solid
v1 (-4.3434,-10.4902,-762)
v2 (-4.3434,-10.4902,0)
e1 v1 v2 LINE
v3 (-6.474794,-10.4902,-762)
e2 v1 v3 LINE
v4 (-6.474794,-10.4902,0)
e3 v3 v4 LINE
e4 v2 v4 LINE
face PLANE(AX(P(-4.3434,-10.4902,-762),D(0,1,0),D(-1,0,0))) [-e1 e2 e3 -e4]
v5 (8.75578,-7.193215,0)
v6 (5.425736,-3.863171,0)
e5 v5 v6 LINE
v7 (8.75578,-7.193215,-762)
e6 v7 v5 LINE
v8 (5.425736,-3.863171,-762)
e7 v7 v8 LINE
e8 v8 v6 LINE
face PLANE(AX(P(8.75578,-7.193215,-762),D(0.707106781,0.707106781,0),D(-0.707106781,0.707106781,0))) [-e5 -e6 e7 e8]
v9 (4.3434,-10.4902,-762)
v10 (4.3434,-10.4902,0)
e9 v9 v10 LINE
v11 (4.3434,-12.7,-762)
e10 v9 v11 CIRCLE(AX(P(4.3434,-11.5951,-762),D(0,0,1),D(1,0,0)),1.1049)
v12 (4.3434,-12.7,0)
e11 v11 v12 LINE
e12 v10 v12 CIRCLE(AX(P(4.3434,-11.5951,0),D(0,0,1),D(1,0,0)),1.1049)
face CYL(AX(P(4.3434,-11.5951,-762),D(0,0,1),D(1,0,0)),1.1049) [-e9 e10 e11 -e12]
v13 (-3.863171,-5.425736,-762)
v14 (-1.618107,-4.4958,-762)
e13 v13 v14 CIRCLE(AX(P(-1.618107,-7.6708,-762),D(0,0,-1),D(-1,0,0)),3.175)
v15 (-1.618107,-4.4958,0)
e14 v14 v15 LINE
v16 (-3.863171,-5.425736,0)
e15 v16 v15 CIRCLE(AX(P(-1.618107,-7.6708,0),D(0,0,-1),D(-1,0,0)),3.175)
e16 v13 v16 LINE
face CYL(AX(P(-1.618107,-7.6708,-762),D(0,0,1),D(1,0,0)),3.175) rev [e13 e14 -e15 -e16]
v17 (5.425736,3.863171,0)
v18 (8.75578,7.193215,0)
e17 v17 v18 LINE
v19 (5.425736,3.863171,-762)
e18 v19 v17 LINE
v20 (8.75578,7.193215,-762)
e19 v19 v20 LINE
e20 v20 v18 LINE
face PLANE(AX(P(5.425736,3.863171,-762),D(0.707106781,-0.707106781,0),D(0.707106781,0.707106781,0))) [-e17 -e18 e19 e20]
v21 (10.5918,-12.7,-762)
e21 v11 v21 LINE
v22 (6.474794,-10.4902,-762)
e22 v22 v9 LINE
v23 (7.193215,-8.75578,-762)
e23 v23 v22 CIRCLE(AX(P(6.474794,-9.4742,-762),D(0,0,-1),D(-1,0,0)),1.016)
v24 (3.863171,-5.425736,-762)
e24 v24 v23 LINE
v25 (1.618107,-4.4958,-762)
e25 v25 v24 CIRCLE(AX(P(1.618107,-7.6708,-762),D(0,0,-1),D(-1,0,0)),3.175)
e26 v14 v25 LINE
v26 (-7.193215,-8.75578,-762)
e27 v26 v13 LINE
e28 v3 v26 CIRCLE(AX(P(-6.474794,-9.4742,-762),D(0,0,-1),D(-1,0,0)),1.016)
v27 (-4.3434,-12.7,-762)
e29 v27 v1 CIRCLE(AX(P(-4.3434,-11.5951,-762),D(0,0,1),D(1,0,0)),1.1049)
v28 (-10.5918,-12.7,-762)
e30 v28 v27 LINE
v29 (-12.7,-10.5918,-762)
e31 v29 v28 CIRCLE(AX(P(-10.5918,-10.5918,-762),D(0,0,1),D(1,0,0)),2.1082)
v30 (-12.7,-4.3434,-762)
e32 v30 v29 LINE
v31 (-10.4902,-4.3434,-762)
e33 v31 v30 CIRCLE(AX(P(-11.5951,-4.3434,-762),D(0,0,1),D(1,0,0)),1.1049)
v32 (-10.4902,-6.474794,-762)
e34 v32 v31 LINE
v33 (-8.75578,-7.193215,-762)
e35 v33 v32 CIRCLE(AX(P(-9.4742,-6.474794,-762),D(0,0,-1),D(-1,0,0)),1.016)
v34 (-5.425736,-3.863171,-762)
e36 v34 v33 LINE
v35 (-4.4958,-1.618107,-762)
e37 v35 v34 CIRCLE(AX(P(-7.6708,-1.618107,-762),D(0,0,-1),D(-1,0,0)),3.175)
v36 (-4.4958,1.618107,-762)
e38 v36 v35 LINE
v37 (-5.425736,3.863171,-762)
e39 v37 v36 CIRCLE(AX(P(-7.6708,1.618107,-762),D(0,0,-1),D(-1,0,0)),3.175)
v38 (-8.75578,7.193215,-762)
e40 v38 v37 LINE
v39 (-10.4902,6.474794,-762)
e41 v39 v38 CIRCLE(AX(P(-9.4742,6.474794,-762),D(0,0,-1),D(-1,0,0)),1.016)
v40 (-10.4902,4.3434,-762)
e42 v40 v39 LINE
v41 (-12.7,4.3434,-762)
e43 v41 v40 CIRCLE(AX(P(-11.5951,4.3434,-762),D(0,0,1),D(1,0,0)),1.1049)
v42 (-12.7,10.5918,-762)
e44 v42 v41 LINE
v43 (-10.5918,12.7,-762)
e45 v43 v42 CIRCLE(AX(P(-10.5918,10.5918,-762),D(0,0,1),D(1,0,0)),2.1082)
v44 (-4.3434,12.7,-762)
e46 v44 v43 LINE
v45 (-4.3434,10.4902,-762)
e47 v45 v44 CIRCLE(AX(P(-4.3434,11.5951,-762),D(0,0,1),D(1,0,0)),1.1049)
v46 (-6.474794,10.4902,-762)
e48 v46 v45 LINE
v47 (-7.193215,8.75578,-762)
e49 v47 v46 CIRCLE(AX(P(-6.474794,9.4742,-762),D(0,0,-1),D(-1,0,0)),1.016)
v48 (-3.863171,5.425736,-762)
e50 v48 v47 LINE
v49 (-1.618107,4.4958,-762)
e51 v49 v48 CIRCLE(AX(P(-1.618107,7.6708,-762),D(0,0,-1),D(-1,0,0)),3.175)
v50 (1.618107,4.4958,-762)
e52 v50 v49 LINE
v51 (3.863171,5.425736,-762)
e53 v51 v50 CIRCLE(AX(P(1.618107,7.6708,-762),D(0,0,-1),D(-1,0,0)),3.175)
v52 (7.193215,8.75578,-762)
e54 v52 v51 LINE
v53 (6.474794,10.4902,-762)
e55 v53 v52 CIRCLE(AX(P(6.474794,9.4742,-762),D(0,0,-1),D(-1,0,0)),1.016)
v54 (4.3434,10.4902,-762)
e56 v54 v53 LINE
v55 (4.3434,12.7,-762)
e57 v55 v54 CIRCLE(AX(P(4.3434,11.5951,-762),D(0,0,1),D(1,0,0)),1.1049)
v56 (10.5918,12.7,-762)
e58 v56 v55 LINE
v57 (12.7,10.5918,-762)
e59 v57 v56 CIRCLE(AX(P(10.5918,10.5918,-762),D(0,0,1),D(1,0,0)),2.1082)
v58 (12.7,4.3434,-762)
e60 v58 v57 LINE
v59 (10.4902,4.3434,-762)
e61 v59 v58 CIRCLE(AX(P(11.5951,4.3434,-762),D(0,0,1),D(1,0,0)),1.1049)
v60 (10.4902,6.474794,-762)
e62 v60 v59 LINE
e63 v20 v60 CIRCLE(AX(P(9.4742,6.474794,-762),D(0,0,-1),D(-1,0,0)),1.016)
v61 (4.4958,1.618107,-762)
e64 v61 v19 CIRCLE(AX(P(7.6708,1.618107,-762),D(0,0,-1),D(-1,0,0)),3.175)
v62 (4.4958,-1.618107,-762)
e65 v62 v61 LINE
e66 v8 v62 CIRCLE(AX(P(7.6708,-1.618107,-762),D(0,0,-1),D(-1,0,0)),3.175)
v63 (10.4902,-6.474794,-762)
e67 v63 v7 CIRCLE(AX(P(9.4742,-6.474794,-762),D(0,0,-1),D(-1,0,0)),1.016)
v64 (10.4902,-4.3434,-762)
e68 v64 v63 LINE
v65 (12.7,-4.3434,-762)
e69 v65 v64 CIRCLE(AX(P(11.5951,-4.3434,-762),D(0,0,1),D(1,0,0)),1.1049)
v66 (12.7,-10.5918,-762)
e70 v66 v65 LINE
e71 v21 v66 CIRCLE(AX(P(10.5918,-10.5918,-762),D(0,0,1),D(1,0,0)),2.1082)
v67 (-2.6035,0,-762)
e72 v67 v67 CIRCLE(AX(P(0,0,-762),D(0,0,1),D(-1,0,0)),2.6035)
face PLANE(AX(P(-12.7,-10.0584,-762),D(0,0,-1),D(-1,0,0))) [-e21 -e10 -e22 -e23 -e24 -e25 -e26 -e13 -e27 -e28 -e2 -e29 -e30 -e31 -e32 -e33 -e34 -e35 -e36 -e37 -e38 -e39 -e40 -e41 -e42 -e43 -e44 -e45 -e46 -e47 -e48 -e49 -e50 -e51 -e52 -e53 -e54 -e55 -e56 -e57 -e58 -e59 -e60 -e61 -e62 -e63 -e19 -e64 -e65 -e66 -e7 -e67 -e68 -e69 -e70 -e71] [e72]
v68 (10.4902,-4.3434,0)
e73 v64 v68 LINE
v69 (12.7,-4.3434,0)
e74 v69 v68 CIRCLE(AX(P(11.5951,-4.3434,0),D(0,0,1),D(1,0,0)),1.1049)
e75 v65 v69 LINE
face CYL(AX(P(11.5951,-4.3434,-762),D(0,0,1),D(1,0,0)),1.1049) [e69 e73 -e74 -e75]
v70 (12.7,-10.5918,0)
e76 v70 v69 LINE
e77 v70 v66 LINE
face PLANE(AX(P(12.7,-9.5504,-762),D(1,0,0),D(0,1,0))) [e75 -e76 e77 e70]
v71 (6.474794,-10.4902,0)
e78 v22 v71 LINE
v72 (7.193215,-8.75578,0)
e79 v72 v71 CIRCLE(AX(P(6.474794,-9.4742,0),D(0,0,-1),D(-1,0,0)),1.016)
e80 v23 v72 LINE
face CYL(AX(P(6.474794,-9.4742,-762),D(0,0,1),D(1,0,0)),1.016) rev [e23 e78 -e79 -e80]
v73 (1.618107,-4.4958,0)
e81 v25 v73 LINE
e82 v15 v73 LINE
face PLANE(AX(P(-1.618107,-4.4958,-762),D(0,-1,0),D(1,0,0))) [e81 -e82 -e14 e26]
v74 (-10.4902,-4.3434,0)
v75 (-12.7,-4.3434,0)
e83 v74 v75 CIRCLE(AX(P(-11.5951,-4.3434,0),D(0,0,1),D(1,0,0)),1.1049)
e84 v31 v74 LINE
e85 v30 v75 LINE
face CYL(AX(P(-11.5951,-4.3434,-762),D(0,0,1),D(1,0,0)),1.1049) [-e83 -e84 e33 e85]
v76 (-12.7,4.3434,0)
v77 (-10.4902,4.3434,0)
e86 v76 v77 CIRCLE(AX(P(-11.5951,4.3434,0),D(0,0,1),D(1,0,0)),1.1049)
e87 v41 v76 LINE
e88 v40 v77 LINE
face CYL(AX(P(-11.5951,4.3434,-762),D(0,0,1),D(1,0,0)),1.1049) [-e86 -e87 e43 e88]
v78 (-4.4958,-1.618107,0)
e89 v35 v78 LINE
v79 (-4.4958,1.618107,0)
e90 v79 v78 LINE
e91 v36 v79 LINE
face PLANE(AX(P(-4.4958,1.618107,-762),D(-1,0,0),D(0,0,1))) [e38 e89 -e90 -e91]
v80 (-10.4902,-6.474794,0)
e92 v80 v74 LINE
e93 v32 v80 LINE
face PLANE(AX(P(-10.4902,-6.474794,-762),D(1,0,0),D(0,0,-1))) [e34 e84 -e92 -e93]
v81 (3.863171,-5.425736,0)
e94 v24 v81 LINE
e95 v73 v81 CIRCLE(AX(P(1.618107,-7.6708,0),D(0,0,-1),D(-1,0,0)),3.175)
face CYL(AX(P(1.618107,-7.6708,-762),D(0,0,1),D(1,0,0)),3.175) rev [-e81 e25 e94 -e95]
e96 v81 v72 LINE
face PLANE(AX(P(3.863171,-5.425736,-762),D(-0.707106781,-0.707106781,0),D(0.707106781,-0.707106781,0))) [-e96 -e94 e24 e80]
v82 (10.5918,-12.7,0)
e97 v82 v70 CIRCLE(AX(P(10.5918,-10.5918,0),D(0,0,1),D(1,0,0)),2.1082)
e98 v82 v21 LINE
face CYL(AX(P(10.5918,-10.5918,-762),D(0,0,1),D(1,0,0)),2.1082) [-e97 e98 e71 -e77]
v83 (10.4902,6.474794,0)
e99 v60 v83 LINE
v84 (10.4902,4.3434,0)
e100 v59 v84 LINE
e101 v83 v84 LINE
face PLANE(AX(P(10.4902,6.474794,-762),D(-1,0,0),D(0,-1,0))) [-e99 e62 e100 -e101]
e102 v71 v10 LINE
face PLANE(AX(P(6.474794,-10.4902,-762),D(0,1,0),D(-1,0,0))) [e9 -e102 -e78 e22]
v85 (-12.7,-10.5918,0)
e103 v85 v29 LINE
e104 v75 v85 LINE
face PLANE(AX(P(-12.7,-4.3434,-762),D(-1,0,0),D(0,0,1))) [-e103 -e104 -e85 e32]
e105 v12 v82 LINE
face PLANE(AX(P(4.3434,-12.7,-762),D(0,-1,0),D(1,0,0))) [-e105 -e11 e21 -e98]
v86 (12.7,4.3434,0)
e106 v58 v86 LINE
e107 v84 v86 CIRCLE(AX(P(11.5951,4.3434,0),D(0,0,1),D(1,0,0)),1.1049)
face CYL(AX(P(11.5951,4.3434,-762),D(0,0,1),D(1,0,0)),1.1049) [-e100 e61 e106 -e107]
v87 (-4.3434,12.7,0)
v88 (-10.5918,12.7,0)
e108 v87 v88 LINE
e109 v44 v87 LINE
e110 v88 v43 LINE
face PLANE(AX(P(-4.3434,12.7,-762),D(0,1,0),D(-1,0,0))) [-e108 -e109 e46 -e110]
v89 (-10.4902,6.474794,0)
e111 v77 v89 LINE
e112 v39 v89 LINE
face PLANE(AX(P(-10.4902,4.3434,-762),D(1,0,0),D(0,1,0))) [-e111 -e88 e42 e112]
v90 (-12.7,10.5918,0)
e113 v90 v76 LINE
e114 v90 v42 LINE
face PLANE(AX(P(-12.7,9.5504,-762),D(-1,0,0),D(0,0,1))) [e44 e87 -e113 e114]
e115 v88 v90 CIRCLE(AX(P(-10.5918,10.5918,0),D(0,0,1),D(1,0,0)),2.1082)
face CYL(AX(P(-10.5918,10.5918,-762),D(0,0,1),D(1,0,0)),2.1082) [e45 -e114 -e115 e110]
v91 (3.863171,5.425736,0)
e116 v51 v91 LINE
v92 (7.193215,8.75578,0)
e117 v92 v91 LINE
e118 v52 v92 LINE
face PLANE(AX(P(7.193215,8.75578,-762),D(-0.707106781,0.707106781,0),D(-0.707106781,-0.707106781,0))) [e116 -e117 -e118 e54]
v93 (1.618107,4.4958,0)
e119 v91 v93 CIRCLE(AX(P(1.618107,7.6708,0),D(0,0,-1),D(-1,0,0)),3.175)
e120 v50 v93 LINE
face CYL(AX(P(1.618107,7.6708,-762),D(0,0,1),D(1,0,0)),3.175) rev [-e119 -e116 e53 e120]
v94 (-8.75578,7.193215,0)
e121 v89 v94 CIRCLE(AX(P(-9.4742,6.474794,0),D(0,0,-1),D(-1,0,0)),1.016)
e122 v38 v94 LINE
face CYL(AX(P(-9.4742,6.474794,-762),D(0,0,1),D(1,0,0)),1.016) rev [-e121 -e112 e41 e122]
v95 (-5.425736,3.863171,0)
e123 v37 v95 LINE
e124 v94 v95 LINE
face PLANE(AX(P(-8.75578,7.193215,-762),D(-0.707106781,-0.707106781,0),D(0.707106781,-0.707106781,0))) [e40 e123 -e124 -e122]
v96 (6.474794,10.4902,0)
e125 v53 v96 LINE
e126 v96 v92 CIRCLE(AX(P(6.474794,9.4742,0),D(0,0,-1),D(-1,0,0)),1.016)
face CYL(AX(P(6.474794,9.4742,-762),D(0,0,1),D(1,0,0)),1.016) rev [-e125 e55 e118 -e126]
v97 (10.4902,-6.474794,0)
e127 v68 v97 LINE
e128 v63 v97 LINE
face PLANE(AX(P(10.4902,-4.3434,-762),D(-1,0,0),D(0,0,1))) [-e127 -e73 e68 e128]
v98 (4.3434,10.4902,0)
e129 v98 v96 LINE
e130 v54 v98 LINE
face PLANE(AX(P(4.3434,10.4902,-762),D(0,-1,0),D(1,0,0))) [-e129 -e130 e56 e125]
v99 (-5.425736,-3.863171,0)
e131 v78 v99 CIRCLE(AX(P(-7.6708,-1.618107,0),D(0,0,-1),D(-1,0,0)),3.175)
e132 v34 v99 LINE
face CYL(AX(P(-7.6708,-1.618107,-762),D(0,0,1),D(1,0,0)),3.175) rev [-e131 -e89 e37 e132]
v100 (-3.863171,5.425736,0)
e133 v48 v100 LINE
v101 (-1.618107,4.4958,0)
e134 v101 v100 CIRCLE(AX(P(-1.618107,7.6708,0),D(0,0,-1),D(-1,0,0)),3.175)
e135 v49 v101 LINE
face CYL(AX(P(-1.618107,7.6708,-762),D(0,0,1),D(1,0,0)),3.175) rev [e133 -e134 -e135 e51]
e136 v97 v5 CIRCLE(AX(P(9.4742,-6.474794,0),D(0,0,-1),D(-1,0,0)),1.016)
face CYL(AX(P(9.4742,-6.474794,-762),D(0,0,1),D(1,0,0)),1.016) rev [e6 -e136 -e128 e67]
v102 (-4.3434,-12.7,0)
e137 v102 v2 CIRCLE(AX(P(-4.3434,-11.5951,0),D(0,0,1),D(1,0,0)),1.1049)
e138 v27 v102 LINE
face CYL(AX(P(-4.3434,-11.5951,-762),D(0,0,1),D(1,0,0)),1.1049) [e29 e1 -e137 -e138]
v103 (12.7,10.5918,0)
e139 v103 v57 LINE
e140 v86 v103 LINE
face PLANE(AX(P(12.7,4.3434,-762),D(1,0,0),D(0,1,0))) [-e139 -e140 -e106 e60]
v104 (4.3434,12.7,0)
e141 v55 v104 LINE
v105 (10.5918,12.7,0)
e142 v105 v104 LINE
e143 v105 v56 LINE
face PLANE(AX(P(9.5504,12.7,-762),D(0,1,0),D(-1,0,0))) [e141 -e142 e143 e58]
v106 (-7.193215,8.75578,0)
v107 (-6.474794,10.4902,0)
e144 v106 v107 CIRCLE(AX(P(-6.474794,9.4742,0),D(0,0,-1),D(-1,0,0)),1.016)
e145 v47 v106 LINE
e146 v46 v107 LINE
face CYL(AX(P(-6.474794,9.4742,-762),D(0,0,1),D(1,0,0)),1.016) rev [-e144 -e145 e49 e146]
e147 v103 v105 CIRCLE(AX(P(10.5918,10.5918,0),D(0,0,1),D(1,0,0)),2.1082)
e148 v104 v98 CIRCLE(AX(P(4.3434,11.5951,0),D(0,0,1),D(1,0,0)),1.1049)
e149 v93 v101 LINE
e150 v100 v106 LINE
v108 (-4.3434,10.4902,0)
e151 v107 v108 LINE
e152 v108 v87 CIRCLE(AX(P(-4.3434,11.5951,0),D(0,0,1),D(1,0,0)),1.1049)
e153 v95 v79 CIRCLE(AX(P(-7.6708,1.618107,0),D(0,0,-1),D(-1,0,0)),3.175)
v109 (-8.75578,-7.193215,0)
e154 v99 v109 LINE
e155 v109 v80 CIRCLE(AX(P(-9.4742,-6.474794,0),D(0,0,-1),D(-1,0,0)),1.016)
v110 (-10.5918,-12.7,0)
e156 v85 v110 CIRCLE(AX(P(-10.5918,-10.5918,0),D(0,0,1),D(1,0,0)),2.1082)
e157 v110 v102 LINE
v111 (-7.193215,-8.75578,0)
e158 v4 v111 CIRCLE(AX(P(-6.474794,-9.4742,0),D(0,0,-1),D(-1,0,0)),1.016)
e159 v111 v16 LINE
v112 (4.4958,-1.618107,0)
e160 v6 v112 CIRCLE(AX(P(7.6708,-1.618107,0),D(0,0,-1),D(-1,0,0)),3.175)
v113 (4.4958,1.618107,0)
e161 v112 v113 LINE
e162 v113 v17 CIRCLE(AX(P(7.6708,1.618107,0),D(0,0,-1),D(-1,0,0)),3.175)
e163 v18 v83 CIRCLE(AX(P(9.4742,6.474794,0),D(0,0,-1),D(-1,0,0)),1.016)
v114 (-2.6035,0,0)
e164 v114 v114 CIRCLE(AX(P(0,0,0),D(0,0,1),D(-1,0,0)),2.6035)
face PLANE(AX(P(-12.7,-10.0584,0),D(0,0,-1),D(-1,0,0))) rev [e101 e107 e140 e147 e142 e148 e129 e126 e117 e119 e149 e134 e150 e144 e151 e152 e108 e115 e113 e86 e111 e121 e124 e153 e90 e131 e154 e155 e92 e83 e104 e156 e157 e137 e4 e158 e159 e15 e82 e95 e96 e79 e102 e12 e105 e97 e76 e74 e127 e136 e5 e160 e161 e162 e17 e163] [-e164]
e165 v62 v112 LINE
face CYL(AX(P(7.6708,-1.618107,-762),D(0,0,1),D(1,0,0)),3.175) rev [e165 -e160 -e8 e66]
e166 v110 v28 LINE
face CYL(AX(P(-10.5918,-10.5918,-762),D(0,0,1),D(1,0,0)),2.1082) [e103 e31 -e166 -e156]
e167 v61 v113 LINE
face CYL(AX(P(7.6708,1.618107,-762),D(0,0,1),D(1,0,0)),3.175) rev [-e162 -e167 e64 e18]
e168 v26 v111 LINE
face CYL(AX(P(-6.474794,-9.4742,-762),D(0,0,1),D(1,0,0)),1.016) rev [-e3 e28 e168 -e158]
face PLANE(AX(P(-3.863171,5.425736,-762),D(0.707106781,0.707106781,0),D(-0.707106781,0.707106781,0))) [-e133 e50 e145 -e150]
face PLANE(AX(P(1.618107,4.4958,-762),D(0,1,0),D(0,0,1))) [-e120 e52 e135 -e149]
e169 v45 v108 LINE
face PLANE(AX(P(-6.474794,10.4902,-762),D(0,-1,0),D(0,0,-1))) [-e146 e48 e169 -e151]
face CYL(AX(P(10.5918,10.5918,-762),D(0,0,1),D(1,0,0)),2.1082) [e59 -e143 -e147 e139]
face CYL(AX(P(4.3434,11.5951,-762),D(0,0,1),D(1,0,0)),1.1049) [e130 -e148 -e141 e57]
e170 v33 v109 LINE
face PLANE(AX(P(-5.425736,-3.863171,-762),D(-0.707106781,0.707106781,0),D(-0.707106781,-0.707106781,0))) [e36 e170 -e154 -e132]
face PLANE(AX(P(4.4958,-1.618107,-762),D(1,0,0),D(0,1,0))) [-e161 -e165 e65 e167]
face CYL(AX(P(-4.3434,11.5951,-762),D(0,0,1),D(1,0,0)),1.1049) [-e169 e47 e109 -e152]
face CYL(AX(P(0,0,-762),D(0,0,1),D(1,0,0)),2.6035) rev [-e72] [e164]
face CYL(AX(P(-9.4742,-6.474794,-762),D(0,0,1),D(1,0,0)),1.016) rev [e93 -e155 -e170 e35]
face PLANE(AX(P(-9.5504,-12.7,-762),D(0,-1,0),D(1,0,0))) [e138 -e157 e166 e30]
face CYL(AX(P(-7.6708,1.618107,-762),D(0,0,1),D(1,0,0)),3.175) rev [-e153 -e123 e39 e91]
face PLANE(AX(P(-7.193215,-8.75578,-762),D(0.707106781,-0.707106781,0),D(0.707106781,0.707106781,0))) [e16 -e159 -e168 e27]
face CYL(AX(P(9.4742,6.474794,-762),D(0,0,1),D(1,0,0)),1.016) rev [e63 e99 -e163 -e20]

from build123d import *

# Parameters (mm, degrees)
SKETCH1_R           = 2.6035
BOSS_EXTRUDE1_DEPTH = 762
DELETEFACE1_START   = -762
DELETEFACE1_DEPTH   = 762


# Read off the part's stored shape, not the designer's step: DeleteFace1
with BuildPart() as part:
    # Sketch1 → Boss-Extrude1 (new body)
    with BuildSketch(Plane.XY):
        with BuildLine():
            Line((-9.5504, -12.7), (-6.3330836, -12.7))
            ThreePointArc((-6.3330836, -12.7), (-5.8250836, -12.192), (-5.3170836, -12.7))
            Line((-5.3170836, -12.7), (-4.343399971, -12.7))
            ThreePointArc((-4.343399971, -12.7), (-3.238499971, -11.5951), (-4.343399971, -10.4902))
            Line((-4.343399971, -10.4902), (-6.474794456, -10.4902))
            ThreePointArc((-6.474794456, -10.4902), (-7.413456061, -9.863006367), (-7.193214945, -8.75577951))
            Line((-7.193214945, -8.75577951), (-3.863171405, -5.42573597))
            ThreePointArc((-3.863171405, -5.42573597), (-2.833127272, -4.737482484), (-1.618107374, -4.4958))
            Line((-1.618107374, -4.4958), (1.618107374, -4.4958))
            ThreePointArc((1.618107374, -4.4958), (2.833127272, -4.737482484), (3.863171405, -5.42573597))
            Line((3.863171405, -5.42573597), (7.193214945, -8.75577951))
            ThreePointArc((7.193214945, -8.75577951), (7.413456061, -9.863006367), (6.474794456, -10.4902))
            Line((6.474794456, -10.4902), (4.3434, -10.4902))
            ThreePointArc((4.3434, -10.4902), (3.2385, -11.5951), (4.3434, -12.7))
            Line((4.3434, -12.7), (5.3170836, -12.7))
            ThreePointArc((5.3170836, -12.7), (5.8250836, -12.192), (6.3330836, -12.7))
            Line((6.3330836, -12.7), (9.5504, -12.7))
            ThreePointArc((9.5504, -12.7), (10.058323491, -12.192000006), (10.566399977, -12.699846982))
            ThreePointArc((10.566399977, -12.699846982), (12.082522516, -12.082522516), (12.699846982, -10.566399977))
            ThreePointArc((12.699846982, -10.566399977), (12.192000006, -10.058323491), (12.7, -9.5504))
            Line((12.7, -9.5504), (12.7, -6.3330836))
            ThreePointArc((12.7, -6.3330836), (12.192, -5.8250836), (12.7, -5.3170836))
            Line((12.7, -5.3170836), (12.7, -4.343399971))
            ThreePointArc((12.7, -4.343399971), (11.5951, -3.238499971), (10.4902, -4.343399971))
            Line((10.4902, -4.343399971), (10.4902, -6.474794456))
            ThreePointArc((10.4902, -6.474794456), (9.863006367, -7.413456061), (8.75577951, -7.193214945))
            Line((8.75577951, -7.193214945), (5.42573597, -3.863171405))
            ThreePointArc((5.42573597, -3.863171405), (4.737482484, -2.833127272), (4.4958, -1.618107374))
            Line((4.4958, -1.618107374), (4.4958, 1.618107374))
            ThreePointArc((4.4958, 1.618107374), (4.737482484, 2.833127272), (5.42573597, 3.863171405))
            Line((5.42573597, 3.863171405), (8.75577951, 7.193214945))
            ThreePointArc((8.75577951, 7.193214945), (9.863006367, 7.413456061), (10.4902, 6.474794456))
            Line((10.4902, 6.474794456), (10.4902, 4.3434))
            ThreePointArc((10.4902, 4.3434), (11.5951, 3.2385), (12.7, 4.3434))
            Line((12.7, 4.3434), (12.7, 5.3170836))
            ThreePointArc((12.7, 5.3170836), (12.192, 5.8250836), (12.7, 6.3330836))
            Line((12.7, 6.3330836), (12.7, 9.5504))
            ThreePointArc((12.7, 9.5504), (12.192000006, 10.058323491), (12.699846982, 10.566399977))
            ThreePointArc((12.699846982, 10.566399977), (12.082522516, 12.082522516), (10.566399977, 12.699846982))
            ThreePointArc((10.566399977, 12.699846982), (10.058323491, 12.192000006), (9.5504, 12.7))
            Line((9.5504, 12.7), (6.3330836, 12.7))
            ThreePointArc((6.3330836, 12.7), (5.8250836, 12.192), (5.3170836, 12.7))
            Line((5.3170836, 12.7), (4.343399971, 12.7))
            ThreePointArc((4.343399971, 12.7), (3.238499971, 11.5951), (4.343399971, 10.4902))
            Line((4.343399971, 10.4902), (6.474794456, 10.4902))
            ThreePointArc((6.474794456, 10.4902), (7.413456061, 9.863006367), (7.193214945, 8.75577951))
            Line((7.193214945, 8.75577951), (3.863171405, 5.42573597))
            ThreePointArc((3.863171405, 5.42573597), (2.833127272, 4.737482484), (1.618107374, 4.4958))
            Line((1.618107374, 4.4958), (-1.618107374, 4.4958))
            ThreePointArc((-1.618107374, 4.4958), (-2.833127272, 4.737482484), (-3.863171405, 5.42573597))
            Line((-3.863171405, 5.42573597), (-7.193214945, 8.75577951))
            ThreePointArc((-7.193214945, 8.75577951), (-7.413456061, 9.863006367), (-6.474794456, 10.4902))
            Line((-6.474794456, 10.4902), (-4.3434, 10.4902))
            ThreePointArc((-4.3434, 10.4902), (-3.2385, 11.5951), (-4.3434, 12.7))
            Line((-4.3434, 12.7), (-5.3170836, 12.7))
            ThreePointArc((-5.3170836, 12.7), (-5.8250836, 12.192), (-6.3330836, 12.7))
            Line((-6.3330836, 12.7), (-9.5504, 12.7))
            ThreePointArc((-9.5504, 12.7), (-10.058323491, 12.192000006), (-10.566399977, 12.699846982))
            ThreePointArc((-10.566399977, 12.699846982), (-12.082522516, 12.082522516), (-12.699846982, 10.566399977))
            ThreePointArc((-12.699846982, 10.566399977), (-12.192000006, 10.058323491), (-12.7, 9.5504))
            Line((-12.7, 9.5504), (-12.7, 6.3330836))
            ThreePointArc((-12.7, 6.3330836), (-12.192, 5.8250836), (-12.7, 5.3170836))
            Line((-12.7, 5.3170836), (-12.7, 4.343399971))
            ThreePointArc((-12.7, 4.343399971), (-11.5951, 3.238499971), (-10.4902, 4.343399971))
            Line((-10.4902, 4.343399971), (-10.4902, 6.474794456))
            ThreePointArc((-10.4902, 6.474794456), (-9.863006367, 7.413456061), (-8.75577951, 7.193214945))
            Line((-8.75577951, 7.193214945), (-5.42573597, 3.863171405))
            ThreePointArc((-5.42573597, 3.863171405), (-4.737482484, 2.833127272), (-4.4958, 1.618107374))
            Line((-4.4958, 1.618107374), (-4.4958, -1.618107374))
            ThreePointArc((-4.4958, -1.618107374), (-4.737482484, -2.833127272), (-5.42573597, -3.863171405))
            Line((-5.42573597, -3.863171405), (-8.75577951, -7.193214945))
            ThreePointArc((-8.75577951, -7.193214945), (-9.863006367, -7.413456061), (-10.4902, -6.474794456))
            Line((-10.4902, -6.474794456), (-10.4902, -4.3434))
            ThreePointArc((-10.4902, -4.3434), (-11.5951, -3.2385), (-12.7, -4.3434))
            Line((-12.7, -4.3434), (-12.7, -5.3170836))
            ThreePointArc((-12.7, -5.3170836), (-12.192, -5.8250836), (-12.7, -6.3330836))
            Line((-12.7, -6.3330836), (-12.7, -9.5504))
            ThreePointArc((-12.7, -9.5504), (-12.192000006, -10.058323491), (-12.699846982, -10.566399977))
            ThreePointArc((-12.699846982, -10.566399977), (-12.082522516, -12.082522516), (-10.566399977, -12.699846982))
            ThreePointArc((-10.566399977, -12.699846982), (-10.058323491, -12.192000006), (-9.5504, -12.7))
        make_face()
        with Locations(Location((0, 0, 0), (0, 0, 180))):
            Circle(SKETCH1_R, mode=Mode.SUBTRACT)
    extrude(amount=-BOSS_EXTRUDE1_DEPTH)

    # DeleteFace1 outline → DeleteFace1 (add)
    with BuildSketch(Plane.XY.offset(DELETEFACE1_START)):
        with BuildLine():
            ThreePointArc((-12.7, -6.3330836), (-12.192, -5.8250836), (-12.7, -5.3170836))
            Line((-12.7, -5.3170836), (-12.7, -6.3330836))
        make_face()
        with BuildLine():
            ThreePointArc((-5.3170836, -12.7), (-5.8250836, -12.192), (-6.3330836, -12.7))
            Line((-6.3330836, -12.7), (-5.3170836, -12.7))
        make_face()
        with BuildLine():
            ThreePointArc((-10.566399977, -12.699846982), (-10.579099758, -12.699961745), (-10.5918, -12.7))
            Line((-10.5918, -12.7), (-9.5504, -12.7))
            ThreePointArc((-9.5504, -12.7), (-10.058323491, -12.192000006), (-10.566399977, -12.699846982))
        make_face()
        with BuildLine():
            ThreePointArc((-12.699846982, -10.566399977), (-12.192000006, -10.058323491), (-12.7, -9.5504))
            Line((-12.7, -9.5504), (-12.7, -10.5918))
            ThreePointArc((-12.7, -10.5918), (-12.699961745, -10.579099758), (-12.699846982, -10.566399977))
        make_face()
        with BuildLine():
            ThreePointArc((-12.699846982, 10.566399977), (-12.699961745, 10.579099758), (-12.7, 10.5918))
            Line((-12.7, 10.5918), (-12.7, 9.5504))
            ThreePointArc((-12.7, 9.5504), (-12.192000006, 10.058323491), (-12.699846982, 10.566399977))
        make_face()
        with BuildLine():
            Line((-5.3170836, 12.7), (-6.3330836, 12.7))
            ThreePointArc((-6.3330836, 12.7), (-5.8250836, 12.192), (-5.3170836, 12.7))
        make_face()
        with BuildLine():
            Line((-9.5504, 12.7), (-10.5918, 12.7))
            ThreePointArc((-10.5918, 12.7), (-10.579099758, 12.699961745), (-10.566399977, 12.699846982))
            ThreePointArc((-10.566399977, 12.699846982), (-10.058323491, 12.192000006), (-9.5504, 12.7))
        make_face()
        with BuildLine():
            ThreePointArc((-12.7, 5.3170836), (-12.192, 5.8250836), (-12.7, 6.3330836))
            Line((-12.7, 6.3330836), (-12.7, 5.3170836))
        make_face()
        with BuildLine():
            ThreePointArc((10.566399977, 12.699846982), (10.579099758, 12.699961745), (10.5918, 12.7))
            Line((10.5918, 12.7), (9.5504, 12.7))
            ThreePointArc((9.5504, 12.7), (10.058323491, 12.192000006), (10.566399977, 12.699846982))
        make_face()
        with BuildLine():
            Line((12.7, 5.3170836), (12.7, 6.3330836))
            ThreePointArc((12.7, 6.3330836), (12.192, 5.8250836), (12.7, 5.3170836))
        make_face()
        with BuildLine():
            Line((12.7, 9.5504), (12.7, 10.5918))
            ThreePointArc((12.7, 10.5918), (12.699961745, 10.579099758), (12.699846982, 10.566399977))
            ThreePointArc((12.699846982, 10.566399977), (12.192000006, 10.058323491), (12.7, 9.5504))
        make_face()
        with BuildLine():
            ThreePointArc((5.3170836, 12.7), (5.8250836, 12.192), (6.3330836, 12.7))
            Line((6.3330836, 12.7), (5.3170836, 12.7))
        make_face()
        with BuildLine():
            ThreePointArc((12.699846982, -10.566399977), (12.699961745, -10.579099758), (12.7, -10.5918))
            Line((12.7, -10.5918), (12.7, -9.5504))
            ThreePointArc((12.7, -9.5504), (12.192000006, -10.058323491), (12.699846982, -10.566399977))
        make_face()
        with BuildLine():
            Line((5.3170836, -12.7), (6.3330836, -12.7))
            ThreePointArc((6.3330836, -12.7), (5.8250836, -12.192), (5.3170836, -12.7))
        make_face()
        with BuildLine():
            Line((9.5504, -12.7), (10.5918, -12.7))
            ThreePointArc((10.5918, -12.7), (10.579099758, -12.699961745), (10.566399977, -12.699846982))
            ThreePointArc((10.566399977, -12.699846982), (10.058323491, -12.192000006), (9.5504, -12.7))
        make_face()
        with BuildLine():
            ThreePointArc((12.7, -5.3170836), (12.192, -5.8250836), (12.7, -6.3330836))
            Line((12.7, -6.3330836), (12.7, -5.3170836))
        make_face()
    extrude(amount=DELETEFACE1_DEPTH)


solid = part.part
